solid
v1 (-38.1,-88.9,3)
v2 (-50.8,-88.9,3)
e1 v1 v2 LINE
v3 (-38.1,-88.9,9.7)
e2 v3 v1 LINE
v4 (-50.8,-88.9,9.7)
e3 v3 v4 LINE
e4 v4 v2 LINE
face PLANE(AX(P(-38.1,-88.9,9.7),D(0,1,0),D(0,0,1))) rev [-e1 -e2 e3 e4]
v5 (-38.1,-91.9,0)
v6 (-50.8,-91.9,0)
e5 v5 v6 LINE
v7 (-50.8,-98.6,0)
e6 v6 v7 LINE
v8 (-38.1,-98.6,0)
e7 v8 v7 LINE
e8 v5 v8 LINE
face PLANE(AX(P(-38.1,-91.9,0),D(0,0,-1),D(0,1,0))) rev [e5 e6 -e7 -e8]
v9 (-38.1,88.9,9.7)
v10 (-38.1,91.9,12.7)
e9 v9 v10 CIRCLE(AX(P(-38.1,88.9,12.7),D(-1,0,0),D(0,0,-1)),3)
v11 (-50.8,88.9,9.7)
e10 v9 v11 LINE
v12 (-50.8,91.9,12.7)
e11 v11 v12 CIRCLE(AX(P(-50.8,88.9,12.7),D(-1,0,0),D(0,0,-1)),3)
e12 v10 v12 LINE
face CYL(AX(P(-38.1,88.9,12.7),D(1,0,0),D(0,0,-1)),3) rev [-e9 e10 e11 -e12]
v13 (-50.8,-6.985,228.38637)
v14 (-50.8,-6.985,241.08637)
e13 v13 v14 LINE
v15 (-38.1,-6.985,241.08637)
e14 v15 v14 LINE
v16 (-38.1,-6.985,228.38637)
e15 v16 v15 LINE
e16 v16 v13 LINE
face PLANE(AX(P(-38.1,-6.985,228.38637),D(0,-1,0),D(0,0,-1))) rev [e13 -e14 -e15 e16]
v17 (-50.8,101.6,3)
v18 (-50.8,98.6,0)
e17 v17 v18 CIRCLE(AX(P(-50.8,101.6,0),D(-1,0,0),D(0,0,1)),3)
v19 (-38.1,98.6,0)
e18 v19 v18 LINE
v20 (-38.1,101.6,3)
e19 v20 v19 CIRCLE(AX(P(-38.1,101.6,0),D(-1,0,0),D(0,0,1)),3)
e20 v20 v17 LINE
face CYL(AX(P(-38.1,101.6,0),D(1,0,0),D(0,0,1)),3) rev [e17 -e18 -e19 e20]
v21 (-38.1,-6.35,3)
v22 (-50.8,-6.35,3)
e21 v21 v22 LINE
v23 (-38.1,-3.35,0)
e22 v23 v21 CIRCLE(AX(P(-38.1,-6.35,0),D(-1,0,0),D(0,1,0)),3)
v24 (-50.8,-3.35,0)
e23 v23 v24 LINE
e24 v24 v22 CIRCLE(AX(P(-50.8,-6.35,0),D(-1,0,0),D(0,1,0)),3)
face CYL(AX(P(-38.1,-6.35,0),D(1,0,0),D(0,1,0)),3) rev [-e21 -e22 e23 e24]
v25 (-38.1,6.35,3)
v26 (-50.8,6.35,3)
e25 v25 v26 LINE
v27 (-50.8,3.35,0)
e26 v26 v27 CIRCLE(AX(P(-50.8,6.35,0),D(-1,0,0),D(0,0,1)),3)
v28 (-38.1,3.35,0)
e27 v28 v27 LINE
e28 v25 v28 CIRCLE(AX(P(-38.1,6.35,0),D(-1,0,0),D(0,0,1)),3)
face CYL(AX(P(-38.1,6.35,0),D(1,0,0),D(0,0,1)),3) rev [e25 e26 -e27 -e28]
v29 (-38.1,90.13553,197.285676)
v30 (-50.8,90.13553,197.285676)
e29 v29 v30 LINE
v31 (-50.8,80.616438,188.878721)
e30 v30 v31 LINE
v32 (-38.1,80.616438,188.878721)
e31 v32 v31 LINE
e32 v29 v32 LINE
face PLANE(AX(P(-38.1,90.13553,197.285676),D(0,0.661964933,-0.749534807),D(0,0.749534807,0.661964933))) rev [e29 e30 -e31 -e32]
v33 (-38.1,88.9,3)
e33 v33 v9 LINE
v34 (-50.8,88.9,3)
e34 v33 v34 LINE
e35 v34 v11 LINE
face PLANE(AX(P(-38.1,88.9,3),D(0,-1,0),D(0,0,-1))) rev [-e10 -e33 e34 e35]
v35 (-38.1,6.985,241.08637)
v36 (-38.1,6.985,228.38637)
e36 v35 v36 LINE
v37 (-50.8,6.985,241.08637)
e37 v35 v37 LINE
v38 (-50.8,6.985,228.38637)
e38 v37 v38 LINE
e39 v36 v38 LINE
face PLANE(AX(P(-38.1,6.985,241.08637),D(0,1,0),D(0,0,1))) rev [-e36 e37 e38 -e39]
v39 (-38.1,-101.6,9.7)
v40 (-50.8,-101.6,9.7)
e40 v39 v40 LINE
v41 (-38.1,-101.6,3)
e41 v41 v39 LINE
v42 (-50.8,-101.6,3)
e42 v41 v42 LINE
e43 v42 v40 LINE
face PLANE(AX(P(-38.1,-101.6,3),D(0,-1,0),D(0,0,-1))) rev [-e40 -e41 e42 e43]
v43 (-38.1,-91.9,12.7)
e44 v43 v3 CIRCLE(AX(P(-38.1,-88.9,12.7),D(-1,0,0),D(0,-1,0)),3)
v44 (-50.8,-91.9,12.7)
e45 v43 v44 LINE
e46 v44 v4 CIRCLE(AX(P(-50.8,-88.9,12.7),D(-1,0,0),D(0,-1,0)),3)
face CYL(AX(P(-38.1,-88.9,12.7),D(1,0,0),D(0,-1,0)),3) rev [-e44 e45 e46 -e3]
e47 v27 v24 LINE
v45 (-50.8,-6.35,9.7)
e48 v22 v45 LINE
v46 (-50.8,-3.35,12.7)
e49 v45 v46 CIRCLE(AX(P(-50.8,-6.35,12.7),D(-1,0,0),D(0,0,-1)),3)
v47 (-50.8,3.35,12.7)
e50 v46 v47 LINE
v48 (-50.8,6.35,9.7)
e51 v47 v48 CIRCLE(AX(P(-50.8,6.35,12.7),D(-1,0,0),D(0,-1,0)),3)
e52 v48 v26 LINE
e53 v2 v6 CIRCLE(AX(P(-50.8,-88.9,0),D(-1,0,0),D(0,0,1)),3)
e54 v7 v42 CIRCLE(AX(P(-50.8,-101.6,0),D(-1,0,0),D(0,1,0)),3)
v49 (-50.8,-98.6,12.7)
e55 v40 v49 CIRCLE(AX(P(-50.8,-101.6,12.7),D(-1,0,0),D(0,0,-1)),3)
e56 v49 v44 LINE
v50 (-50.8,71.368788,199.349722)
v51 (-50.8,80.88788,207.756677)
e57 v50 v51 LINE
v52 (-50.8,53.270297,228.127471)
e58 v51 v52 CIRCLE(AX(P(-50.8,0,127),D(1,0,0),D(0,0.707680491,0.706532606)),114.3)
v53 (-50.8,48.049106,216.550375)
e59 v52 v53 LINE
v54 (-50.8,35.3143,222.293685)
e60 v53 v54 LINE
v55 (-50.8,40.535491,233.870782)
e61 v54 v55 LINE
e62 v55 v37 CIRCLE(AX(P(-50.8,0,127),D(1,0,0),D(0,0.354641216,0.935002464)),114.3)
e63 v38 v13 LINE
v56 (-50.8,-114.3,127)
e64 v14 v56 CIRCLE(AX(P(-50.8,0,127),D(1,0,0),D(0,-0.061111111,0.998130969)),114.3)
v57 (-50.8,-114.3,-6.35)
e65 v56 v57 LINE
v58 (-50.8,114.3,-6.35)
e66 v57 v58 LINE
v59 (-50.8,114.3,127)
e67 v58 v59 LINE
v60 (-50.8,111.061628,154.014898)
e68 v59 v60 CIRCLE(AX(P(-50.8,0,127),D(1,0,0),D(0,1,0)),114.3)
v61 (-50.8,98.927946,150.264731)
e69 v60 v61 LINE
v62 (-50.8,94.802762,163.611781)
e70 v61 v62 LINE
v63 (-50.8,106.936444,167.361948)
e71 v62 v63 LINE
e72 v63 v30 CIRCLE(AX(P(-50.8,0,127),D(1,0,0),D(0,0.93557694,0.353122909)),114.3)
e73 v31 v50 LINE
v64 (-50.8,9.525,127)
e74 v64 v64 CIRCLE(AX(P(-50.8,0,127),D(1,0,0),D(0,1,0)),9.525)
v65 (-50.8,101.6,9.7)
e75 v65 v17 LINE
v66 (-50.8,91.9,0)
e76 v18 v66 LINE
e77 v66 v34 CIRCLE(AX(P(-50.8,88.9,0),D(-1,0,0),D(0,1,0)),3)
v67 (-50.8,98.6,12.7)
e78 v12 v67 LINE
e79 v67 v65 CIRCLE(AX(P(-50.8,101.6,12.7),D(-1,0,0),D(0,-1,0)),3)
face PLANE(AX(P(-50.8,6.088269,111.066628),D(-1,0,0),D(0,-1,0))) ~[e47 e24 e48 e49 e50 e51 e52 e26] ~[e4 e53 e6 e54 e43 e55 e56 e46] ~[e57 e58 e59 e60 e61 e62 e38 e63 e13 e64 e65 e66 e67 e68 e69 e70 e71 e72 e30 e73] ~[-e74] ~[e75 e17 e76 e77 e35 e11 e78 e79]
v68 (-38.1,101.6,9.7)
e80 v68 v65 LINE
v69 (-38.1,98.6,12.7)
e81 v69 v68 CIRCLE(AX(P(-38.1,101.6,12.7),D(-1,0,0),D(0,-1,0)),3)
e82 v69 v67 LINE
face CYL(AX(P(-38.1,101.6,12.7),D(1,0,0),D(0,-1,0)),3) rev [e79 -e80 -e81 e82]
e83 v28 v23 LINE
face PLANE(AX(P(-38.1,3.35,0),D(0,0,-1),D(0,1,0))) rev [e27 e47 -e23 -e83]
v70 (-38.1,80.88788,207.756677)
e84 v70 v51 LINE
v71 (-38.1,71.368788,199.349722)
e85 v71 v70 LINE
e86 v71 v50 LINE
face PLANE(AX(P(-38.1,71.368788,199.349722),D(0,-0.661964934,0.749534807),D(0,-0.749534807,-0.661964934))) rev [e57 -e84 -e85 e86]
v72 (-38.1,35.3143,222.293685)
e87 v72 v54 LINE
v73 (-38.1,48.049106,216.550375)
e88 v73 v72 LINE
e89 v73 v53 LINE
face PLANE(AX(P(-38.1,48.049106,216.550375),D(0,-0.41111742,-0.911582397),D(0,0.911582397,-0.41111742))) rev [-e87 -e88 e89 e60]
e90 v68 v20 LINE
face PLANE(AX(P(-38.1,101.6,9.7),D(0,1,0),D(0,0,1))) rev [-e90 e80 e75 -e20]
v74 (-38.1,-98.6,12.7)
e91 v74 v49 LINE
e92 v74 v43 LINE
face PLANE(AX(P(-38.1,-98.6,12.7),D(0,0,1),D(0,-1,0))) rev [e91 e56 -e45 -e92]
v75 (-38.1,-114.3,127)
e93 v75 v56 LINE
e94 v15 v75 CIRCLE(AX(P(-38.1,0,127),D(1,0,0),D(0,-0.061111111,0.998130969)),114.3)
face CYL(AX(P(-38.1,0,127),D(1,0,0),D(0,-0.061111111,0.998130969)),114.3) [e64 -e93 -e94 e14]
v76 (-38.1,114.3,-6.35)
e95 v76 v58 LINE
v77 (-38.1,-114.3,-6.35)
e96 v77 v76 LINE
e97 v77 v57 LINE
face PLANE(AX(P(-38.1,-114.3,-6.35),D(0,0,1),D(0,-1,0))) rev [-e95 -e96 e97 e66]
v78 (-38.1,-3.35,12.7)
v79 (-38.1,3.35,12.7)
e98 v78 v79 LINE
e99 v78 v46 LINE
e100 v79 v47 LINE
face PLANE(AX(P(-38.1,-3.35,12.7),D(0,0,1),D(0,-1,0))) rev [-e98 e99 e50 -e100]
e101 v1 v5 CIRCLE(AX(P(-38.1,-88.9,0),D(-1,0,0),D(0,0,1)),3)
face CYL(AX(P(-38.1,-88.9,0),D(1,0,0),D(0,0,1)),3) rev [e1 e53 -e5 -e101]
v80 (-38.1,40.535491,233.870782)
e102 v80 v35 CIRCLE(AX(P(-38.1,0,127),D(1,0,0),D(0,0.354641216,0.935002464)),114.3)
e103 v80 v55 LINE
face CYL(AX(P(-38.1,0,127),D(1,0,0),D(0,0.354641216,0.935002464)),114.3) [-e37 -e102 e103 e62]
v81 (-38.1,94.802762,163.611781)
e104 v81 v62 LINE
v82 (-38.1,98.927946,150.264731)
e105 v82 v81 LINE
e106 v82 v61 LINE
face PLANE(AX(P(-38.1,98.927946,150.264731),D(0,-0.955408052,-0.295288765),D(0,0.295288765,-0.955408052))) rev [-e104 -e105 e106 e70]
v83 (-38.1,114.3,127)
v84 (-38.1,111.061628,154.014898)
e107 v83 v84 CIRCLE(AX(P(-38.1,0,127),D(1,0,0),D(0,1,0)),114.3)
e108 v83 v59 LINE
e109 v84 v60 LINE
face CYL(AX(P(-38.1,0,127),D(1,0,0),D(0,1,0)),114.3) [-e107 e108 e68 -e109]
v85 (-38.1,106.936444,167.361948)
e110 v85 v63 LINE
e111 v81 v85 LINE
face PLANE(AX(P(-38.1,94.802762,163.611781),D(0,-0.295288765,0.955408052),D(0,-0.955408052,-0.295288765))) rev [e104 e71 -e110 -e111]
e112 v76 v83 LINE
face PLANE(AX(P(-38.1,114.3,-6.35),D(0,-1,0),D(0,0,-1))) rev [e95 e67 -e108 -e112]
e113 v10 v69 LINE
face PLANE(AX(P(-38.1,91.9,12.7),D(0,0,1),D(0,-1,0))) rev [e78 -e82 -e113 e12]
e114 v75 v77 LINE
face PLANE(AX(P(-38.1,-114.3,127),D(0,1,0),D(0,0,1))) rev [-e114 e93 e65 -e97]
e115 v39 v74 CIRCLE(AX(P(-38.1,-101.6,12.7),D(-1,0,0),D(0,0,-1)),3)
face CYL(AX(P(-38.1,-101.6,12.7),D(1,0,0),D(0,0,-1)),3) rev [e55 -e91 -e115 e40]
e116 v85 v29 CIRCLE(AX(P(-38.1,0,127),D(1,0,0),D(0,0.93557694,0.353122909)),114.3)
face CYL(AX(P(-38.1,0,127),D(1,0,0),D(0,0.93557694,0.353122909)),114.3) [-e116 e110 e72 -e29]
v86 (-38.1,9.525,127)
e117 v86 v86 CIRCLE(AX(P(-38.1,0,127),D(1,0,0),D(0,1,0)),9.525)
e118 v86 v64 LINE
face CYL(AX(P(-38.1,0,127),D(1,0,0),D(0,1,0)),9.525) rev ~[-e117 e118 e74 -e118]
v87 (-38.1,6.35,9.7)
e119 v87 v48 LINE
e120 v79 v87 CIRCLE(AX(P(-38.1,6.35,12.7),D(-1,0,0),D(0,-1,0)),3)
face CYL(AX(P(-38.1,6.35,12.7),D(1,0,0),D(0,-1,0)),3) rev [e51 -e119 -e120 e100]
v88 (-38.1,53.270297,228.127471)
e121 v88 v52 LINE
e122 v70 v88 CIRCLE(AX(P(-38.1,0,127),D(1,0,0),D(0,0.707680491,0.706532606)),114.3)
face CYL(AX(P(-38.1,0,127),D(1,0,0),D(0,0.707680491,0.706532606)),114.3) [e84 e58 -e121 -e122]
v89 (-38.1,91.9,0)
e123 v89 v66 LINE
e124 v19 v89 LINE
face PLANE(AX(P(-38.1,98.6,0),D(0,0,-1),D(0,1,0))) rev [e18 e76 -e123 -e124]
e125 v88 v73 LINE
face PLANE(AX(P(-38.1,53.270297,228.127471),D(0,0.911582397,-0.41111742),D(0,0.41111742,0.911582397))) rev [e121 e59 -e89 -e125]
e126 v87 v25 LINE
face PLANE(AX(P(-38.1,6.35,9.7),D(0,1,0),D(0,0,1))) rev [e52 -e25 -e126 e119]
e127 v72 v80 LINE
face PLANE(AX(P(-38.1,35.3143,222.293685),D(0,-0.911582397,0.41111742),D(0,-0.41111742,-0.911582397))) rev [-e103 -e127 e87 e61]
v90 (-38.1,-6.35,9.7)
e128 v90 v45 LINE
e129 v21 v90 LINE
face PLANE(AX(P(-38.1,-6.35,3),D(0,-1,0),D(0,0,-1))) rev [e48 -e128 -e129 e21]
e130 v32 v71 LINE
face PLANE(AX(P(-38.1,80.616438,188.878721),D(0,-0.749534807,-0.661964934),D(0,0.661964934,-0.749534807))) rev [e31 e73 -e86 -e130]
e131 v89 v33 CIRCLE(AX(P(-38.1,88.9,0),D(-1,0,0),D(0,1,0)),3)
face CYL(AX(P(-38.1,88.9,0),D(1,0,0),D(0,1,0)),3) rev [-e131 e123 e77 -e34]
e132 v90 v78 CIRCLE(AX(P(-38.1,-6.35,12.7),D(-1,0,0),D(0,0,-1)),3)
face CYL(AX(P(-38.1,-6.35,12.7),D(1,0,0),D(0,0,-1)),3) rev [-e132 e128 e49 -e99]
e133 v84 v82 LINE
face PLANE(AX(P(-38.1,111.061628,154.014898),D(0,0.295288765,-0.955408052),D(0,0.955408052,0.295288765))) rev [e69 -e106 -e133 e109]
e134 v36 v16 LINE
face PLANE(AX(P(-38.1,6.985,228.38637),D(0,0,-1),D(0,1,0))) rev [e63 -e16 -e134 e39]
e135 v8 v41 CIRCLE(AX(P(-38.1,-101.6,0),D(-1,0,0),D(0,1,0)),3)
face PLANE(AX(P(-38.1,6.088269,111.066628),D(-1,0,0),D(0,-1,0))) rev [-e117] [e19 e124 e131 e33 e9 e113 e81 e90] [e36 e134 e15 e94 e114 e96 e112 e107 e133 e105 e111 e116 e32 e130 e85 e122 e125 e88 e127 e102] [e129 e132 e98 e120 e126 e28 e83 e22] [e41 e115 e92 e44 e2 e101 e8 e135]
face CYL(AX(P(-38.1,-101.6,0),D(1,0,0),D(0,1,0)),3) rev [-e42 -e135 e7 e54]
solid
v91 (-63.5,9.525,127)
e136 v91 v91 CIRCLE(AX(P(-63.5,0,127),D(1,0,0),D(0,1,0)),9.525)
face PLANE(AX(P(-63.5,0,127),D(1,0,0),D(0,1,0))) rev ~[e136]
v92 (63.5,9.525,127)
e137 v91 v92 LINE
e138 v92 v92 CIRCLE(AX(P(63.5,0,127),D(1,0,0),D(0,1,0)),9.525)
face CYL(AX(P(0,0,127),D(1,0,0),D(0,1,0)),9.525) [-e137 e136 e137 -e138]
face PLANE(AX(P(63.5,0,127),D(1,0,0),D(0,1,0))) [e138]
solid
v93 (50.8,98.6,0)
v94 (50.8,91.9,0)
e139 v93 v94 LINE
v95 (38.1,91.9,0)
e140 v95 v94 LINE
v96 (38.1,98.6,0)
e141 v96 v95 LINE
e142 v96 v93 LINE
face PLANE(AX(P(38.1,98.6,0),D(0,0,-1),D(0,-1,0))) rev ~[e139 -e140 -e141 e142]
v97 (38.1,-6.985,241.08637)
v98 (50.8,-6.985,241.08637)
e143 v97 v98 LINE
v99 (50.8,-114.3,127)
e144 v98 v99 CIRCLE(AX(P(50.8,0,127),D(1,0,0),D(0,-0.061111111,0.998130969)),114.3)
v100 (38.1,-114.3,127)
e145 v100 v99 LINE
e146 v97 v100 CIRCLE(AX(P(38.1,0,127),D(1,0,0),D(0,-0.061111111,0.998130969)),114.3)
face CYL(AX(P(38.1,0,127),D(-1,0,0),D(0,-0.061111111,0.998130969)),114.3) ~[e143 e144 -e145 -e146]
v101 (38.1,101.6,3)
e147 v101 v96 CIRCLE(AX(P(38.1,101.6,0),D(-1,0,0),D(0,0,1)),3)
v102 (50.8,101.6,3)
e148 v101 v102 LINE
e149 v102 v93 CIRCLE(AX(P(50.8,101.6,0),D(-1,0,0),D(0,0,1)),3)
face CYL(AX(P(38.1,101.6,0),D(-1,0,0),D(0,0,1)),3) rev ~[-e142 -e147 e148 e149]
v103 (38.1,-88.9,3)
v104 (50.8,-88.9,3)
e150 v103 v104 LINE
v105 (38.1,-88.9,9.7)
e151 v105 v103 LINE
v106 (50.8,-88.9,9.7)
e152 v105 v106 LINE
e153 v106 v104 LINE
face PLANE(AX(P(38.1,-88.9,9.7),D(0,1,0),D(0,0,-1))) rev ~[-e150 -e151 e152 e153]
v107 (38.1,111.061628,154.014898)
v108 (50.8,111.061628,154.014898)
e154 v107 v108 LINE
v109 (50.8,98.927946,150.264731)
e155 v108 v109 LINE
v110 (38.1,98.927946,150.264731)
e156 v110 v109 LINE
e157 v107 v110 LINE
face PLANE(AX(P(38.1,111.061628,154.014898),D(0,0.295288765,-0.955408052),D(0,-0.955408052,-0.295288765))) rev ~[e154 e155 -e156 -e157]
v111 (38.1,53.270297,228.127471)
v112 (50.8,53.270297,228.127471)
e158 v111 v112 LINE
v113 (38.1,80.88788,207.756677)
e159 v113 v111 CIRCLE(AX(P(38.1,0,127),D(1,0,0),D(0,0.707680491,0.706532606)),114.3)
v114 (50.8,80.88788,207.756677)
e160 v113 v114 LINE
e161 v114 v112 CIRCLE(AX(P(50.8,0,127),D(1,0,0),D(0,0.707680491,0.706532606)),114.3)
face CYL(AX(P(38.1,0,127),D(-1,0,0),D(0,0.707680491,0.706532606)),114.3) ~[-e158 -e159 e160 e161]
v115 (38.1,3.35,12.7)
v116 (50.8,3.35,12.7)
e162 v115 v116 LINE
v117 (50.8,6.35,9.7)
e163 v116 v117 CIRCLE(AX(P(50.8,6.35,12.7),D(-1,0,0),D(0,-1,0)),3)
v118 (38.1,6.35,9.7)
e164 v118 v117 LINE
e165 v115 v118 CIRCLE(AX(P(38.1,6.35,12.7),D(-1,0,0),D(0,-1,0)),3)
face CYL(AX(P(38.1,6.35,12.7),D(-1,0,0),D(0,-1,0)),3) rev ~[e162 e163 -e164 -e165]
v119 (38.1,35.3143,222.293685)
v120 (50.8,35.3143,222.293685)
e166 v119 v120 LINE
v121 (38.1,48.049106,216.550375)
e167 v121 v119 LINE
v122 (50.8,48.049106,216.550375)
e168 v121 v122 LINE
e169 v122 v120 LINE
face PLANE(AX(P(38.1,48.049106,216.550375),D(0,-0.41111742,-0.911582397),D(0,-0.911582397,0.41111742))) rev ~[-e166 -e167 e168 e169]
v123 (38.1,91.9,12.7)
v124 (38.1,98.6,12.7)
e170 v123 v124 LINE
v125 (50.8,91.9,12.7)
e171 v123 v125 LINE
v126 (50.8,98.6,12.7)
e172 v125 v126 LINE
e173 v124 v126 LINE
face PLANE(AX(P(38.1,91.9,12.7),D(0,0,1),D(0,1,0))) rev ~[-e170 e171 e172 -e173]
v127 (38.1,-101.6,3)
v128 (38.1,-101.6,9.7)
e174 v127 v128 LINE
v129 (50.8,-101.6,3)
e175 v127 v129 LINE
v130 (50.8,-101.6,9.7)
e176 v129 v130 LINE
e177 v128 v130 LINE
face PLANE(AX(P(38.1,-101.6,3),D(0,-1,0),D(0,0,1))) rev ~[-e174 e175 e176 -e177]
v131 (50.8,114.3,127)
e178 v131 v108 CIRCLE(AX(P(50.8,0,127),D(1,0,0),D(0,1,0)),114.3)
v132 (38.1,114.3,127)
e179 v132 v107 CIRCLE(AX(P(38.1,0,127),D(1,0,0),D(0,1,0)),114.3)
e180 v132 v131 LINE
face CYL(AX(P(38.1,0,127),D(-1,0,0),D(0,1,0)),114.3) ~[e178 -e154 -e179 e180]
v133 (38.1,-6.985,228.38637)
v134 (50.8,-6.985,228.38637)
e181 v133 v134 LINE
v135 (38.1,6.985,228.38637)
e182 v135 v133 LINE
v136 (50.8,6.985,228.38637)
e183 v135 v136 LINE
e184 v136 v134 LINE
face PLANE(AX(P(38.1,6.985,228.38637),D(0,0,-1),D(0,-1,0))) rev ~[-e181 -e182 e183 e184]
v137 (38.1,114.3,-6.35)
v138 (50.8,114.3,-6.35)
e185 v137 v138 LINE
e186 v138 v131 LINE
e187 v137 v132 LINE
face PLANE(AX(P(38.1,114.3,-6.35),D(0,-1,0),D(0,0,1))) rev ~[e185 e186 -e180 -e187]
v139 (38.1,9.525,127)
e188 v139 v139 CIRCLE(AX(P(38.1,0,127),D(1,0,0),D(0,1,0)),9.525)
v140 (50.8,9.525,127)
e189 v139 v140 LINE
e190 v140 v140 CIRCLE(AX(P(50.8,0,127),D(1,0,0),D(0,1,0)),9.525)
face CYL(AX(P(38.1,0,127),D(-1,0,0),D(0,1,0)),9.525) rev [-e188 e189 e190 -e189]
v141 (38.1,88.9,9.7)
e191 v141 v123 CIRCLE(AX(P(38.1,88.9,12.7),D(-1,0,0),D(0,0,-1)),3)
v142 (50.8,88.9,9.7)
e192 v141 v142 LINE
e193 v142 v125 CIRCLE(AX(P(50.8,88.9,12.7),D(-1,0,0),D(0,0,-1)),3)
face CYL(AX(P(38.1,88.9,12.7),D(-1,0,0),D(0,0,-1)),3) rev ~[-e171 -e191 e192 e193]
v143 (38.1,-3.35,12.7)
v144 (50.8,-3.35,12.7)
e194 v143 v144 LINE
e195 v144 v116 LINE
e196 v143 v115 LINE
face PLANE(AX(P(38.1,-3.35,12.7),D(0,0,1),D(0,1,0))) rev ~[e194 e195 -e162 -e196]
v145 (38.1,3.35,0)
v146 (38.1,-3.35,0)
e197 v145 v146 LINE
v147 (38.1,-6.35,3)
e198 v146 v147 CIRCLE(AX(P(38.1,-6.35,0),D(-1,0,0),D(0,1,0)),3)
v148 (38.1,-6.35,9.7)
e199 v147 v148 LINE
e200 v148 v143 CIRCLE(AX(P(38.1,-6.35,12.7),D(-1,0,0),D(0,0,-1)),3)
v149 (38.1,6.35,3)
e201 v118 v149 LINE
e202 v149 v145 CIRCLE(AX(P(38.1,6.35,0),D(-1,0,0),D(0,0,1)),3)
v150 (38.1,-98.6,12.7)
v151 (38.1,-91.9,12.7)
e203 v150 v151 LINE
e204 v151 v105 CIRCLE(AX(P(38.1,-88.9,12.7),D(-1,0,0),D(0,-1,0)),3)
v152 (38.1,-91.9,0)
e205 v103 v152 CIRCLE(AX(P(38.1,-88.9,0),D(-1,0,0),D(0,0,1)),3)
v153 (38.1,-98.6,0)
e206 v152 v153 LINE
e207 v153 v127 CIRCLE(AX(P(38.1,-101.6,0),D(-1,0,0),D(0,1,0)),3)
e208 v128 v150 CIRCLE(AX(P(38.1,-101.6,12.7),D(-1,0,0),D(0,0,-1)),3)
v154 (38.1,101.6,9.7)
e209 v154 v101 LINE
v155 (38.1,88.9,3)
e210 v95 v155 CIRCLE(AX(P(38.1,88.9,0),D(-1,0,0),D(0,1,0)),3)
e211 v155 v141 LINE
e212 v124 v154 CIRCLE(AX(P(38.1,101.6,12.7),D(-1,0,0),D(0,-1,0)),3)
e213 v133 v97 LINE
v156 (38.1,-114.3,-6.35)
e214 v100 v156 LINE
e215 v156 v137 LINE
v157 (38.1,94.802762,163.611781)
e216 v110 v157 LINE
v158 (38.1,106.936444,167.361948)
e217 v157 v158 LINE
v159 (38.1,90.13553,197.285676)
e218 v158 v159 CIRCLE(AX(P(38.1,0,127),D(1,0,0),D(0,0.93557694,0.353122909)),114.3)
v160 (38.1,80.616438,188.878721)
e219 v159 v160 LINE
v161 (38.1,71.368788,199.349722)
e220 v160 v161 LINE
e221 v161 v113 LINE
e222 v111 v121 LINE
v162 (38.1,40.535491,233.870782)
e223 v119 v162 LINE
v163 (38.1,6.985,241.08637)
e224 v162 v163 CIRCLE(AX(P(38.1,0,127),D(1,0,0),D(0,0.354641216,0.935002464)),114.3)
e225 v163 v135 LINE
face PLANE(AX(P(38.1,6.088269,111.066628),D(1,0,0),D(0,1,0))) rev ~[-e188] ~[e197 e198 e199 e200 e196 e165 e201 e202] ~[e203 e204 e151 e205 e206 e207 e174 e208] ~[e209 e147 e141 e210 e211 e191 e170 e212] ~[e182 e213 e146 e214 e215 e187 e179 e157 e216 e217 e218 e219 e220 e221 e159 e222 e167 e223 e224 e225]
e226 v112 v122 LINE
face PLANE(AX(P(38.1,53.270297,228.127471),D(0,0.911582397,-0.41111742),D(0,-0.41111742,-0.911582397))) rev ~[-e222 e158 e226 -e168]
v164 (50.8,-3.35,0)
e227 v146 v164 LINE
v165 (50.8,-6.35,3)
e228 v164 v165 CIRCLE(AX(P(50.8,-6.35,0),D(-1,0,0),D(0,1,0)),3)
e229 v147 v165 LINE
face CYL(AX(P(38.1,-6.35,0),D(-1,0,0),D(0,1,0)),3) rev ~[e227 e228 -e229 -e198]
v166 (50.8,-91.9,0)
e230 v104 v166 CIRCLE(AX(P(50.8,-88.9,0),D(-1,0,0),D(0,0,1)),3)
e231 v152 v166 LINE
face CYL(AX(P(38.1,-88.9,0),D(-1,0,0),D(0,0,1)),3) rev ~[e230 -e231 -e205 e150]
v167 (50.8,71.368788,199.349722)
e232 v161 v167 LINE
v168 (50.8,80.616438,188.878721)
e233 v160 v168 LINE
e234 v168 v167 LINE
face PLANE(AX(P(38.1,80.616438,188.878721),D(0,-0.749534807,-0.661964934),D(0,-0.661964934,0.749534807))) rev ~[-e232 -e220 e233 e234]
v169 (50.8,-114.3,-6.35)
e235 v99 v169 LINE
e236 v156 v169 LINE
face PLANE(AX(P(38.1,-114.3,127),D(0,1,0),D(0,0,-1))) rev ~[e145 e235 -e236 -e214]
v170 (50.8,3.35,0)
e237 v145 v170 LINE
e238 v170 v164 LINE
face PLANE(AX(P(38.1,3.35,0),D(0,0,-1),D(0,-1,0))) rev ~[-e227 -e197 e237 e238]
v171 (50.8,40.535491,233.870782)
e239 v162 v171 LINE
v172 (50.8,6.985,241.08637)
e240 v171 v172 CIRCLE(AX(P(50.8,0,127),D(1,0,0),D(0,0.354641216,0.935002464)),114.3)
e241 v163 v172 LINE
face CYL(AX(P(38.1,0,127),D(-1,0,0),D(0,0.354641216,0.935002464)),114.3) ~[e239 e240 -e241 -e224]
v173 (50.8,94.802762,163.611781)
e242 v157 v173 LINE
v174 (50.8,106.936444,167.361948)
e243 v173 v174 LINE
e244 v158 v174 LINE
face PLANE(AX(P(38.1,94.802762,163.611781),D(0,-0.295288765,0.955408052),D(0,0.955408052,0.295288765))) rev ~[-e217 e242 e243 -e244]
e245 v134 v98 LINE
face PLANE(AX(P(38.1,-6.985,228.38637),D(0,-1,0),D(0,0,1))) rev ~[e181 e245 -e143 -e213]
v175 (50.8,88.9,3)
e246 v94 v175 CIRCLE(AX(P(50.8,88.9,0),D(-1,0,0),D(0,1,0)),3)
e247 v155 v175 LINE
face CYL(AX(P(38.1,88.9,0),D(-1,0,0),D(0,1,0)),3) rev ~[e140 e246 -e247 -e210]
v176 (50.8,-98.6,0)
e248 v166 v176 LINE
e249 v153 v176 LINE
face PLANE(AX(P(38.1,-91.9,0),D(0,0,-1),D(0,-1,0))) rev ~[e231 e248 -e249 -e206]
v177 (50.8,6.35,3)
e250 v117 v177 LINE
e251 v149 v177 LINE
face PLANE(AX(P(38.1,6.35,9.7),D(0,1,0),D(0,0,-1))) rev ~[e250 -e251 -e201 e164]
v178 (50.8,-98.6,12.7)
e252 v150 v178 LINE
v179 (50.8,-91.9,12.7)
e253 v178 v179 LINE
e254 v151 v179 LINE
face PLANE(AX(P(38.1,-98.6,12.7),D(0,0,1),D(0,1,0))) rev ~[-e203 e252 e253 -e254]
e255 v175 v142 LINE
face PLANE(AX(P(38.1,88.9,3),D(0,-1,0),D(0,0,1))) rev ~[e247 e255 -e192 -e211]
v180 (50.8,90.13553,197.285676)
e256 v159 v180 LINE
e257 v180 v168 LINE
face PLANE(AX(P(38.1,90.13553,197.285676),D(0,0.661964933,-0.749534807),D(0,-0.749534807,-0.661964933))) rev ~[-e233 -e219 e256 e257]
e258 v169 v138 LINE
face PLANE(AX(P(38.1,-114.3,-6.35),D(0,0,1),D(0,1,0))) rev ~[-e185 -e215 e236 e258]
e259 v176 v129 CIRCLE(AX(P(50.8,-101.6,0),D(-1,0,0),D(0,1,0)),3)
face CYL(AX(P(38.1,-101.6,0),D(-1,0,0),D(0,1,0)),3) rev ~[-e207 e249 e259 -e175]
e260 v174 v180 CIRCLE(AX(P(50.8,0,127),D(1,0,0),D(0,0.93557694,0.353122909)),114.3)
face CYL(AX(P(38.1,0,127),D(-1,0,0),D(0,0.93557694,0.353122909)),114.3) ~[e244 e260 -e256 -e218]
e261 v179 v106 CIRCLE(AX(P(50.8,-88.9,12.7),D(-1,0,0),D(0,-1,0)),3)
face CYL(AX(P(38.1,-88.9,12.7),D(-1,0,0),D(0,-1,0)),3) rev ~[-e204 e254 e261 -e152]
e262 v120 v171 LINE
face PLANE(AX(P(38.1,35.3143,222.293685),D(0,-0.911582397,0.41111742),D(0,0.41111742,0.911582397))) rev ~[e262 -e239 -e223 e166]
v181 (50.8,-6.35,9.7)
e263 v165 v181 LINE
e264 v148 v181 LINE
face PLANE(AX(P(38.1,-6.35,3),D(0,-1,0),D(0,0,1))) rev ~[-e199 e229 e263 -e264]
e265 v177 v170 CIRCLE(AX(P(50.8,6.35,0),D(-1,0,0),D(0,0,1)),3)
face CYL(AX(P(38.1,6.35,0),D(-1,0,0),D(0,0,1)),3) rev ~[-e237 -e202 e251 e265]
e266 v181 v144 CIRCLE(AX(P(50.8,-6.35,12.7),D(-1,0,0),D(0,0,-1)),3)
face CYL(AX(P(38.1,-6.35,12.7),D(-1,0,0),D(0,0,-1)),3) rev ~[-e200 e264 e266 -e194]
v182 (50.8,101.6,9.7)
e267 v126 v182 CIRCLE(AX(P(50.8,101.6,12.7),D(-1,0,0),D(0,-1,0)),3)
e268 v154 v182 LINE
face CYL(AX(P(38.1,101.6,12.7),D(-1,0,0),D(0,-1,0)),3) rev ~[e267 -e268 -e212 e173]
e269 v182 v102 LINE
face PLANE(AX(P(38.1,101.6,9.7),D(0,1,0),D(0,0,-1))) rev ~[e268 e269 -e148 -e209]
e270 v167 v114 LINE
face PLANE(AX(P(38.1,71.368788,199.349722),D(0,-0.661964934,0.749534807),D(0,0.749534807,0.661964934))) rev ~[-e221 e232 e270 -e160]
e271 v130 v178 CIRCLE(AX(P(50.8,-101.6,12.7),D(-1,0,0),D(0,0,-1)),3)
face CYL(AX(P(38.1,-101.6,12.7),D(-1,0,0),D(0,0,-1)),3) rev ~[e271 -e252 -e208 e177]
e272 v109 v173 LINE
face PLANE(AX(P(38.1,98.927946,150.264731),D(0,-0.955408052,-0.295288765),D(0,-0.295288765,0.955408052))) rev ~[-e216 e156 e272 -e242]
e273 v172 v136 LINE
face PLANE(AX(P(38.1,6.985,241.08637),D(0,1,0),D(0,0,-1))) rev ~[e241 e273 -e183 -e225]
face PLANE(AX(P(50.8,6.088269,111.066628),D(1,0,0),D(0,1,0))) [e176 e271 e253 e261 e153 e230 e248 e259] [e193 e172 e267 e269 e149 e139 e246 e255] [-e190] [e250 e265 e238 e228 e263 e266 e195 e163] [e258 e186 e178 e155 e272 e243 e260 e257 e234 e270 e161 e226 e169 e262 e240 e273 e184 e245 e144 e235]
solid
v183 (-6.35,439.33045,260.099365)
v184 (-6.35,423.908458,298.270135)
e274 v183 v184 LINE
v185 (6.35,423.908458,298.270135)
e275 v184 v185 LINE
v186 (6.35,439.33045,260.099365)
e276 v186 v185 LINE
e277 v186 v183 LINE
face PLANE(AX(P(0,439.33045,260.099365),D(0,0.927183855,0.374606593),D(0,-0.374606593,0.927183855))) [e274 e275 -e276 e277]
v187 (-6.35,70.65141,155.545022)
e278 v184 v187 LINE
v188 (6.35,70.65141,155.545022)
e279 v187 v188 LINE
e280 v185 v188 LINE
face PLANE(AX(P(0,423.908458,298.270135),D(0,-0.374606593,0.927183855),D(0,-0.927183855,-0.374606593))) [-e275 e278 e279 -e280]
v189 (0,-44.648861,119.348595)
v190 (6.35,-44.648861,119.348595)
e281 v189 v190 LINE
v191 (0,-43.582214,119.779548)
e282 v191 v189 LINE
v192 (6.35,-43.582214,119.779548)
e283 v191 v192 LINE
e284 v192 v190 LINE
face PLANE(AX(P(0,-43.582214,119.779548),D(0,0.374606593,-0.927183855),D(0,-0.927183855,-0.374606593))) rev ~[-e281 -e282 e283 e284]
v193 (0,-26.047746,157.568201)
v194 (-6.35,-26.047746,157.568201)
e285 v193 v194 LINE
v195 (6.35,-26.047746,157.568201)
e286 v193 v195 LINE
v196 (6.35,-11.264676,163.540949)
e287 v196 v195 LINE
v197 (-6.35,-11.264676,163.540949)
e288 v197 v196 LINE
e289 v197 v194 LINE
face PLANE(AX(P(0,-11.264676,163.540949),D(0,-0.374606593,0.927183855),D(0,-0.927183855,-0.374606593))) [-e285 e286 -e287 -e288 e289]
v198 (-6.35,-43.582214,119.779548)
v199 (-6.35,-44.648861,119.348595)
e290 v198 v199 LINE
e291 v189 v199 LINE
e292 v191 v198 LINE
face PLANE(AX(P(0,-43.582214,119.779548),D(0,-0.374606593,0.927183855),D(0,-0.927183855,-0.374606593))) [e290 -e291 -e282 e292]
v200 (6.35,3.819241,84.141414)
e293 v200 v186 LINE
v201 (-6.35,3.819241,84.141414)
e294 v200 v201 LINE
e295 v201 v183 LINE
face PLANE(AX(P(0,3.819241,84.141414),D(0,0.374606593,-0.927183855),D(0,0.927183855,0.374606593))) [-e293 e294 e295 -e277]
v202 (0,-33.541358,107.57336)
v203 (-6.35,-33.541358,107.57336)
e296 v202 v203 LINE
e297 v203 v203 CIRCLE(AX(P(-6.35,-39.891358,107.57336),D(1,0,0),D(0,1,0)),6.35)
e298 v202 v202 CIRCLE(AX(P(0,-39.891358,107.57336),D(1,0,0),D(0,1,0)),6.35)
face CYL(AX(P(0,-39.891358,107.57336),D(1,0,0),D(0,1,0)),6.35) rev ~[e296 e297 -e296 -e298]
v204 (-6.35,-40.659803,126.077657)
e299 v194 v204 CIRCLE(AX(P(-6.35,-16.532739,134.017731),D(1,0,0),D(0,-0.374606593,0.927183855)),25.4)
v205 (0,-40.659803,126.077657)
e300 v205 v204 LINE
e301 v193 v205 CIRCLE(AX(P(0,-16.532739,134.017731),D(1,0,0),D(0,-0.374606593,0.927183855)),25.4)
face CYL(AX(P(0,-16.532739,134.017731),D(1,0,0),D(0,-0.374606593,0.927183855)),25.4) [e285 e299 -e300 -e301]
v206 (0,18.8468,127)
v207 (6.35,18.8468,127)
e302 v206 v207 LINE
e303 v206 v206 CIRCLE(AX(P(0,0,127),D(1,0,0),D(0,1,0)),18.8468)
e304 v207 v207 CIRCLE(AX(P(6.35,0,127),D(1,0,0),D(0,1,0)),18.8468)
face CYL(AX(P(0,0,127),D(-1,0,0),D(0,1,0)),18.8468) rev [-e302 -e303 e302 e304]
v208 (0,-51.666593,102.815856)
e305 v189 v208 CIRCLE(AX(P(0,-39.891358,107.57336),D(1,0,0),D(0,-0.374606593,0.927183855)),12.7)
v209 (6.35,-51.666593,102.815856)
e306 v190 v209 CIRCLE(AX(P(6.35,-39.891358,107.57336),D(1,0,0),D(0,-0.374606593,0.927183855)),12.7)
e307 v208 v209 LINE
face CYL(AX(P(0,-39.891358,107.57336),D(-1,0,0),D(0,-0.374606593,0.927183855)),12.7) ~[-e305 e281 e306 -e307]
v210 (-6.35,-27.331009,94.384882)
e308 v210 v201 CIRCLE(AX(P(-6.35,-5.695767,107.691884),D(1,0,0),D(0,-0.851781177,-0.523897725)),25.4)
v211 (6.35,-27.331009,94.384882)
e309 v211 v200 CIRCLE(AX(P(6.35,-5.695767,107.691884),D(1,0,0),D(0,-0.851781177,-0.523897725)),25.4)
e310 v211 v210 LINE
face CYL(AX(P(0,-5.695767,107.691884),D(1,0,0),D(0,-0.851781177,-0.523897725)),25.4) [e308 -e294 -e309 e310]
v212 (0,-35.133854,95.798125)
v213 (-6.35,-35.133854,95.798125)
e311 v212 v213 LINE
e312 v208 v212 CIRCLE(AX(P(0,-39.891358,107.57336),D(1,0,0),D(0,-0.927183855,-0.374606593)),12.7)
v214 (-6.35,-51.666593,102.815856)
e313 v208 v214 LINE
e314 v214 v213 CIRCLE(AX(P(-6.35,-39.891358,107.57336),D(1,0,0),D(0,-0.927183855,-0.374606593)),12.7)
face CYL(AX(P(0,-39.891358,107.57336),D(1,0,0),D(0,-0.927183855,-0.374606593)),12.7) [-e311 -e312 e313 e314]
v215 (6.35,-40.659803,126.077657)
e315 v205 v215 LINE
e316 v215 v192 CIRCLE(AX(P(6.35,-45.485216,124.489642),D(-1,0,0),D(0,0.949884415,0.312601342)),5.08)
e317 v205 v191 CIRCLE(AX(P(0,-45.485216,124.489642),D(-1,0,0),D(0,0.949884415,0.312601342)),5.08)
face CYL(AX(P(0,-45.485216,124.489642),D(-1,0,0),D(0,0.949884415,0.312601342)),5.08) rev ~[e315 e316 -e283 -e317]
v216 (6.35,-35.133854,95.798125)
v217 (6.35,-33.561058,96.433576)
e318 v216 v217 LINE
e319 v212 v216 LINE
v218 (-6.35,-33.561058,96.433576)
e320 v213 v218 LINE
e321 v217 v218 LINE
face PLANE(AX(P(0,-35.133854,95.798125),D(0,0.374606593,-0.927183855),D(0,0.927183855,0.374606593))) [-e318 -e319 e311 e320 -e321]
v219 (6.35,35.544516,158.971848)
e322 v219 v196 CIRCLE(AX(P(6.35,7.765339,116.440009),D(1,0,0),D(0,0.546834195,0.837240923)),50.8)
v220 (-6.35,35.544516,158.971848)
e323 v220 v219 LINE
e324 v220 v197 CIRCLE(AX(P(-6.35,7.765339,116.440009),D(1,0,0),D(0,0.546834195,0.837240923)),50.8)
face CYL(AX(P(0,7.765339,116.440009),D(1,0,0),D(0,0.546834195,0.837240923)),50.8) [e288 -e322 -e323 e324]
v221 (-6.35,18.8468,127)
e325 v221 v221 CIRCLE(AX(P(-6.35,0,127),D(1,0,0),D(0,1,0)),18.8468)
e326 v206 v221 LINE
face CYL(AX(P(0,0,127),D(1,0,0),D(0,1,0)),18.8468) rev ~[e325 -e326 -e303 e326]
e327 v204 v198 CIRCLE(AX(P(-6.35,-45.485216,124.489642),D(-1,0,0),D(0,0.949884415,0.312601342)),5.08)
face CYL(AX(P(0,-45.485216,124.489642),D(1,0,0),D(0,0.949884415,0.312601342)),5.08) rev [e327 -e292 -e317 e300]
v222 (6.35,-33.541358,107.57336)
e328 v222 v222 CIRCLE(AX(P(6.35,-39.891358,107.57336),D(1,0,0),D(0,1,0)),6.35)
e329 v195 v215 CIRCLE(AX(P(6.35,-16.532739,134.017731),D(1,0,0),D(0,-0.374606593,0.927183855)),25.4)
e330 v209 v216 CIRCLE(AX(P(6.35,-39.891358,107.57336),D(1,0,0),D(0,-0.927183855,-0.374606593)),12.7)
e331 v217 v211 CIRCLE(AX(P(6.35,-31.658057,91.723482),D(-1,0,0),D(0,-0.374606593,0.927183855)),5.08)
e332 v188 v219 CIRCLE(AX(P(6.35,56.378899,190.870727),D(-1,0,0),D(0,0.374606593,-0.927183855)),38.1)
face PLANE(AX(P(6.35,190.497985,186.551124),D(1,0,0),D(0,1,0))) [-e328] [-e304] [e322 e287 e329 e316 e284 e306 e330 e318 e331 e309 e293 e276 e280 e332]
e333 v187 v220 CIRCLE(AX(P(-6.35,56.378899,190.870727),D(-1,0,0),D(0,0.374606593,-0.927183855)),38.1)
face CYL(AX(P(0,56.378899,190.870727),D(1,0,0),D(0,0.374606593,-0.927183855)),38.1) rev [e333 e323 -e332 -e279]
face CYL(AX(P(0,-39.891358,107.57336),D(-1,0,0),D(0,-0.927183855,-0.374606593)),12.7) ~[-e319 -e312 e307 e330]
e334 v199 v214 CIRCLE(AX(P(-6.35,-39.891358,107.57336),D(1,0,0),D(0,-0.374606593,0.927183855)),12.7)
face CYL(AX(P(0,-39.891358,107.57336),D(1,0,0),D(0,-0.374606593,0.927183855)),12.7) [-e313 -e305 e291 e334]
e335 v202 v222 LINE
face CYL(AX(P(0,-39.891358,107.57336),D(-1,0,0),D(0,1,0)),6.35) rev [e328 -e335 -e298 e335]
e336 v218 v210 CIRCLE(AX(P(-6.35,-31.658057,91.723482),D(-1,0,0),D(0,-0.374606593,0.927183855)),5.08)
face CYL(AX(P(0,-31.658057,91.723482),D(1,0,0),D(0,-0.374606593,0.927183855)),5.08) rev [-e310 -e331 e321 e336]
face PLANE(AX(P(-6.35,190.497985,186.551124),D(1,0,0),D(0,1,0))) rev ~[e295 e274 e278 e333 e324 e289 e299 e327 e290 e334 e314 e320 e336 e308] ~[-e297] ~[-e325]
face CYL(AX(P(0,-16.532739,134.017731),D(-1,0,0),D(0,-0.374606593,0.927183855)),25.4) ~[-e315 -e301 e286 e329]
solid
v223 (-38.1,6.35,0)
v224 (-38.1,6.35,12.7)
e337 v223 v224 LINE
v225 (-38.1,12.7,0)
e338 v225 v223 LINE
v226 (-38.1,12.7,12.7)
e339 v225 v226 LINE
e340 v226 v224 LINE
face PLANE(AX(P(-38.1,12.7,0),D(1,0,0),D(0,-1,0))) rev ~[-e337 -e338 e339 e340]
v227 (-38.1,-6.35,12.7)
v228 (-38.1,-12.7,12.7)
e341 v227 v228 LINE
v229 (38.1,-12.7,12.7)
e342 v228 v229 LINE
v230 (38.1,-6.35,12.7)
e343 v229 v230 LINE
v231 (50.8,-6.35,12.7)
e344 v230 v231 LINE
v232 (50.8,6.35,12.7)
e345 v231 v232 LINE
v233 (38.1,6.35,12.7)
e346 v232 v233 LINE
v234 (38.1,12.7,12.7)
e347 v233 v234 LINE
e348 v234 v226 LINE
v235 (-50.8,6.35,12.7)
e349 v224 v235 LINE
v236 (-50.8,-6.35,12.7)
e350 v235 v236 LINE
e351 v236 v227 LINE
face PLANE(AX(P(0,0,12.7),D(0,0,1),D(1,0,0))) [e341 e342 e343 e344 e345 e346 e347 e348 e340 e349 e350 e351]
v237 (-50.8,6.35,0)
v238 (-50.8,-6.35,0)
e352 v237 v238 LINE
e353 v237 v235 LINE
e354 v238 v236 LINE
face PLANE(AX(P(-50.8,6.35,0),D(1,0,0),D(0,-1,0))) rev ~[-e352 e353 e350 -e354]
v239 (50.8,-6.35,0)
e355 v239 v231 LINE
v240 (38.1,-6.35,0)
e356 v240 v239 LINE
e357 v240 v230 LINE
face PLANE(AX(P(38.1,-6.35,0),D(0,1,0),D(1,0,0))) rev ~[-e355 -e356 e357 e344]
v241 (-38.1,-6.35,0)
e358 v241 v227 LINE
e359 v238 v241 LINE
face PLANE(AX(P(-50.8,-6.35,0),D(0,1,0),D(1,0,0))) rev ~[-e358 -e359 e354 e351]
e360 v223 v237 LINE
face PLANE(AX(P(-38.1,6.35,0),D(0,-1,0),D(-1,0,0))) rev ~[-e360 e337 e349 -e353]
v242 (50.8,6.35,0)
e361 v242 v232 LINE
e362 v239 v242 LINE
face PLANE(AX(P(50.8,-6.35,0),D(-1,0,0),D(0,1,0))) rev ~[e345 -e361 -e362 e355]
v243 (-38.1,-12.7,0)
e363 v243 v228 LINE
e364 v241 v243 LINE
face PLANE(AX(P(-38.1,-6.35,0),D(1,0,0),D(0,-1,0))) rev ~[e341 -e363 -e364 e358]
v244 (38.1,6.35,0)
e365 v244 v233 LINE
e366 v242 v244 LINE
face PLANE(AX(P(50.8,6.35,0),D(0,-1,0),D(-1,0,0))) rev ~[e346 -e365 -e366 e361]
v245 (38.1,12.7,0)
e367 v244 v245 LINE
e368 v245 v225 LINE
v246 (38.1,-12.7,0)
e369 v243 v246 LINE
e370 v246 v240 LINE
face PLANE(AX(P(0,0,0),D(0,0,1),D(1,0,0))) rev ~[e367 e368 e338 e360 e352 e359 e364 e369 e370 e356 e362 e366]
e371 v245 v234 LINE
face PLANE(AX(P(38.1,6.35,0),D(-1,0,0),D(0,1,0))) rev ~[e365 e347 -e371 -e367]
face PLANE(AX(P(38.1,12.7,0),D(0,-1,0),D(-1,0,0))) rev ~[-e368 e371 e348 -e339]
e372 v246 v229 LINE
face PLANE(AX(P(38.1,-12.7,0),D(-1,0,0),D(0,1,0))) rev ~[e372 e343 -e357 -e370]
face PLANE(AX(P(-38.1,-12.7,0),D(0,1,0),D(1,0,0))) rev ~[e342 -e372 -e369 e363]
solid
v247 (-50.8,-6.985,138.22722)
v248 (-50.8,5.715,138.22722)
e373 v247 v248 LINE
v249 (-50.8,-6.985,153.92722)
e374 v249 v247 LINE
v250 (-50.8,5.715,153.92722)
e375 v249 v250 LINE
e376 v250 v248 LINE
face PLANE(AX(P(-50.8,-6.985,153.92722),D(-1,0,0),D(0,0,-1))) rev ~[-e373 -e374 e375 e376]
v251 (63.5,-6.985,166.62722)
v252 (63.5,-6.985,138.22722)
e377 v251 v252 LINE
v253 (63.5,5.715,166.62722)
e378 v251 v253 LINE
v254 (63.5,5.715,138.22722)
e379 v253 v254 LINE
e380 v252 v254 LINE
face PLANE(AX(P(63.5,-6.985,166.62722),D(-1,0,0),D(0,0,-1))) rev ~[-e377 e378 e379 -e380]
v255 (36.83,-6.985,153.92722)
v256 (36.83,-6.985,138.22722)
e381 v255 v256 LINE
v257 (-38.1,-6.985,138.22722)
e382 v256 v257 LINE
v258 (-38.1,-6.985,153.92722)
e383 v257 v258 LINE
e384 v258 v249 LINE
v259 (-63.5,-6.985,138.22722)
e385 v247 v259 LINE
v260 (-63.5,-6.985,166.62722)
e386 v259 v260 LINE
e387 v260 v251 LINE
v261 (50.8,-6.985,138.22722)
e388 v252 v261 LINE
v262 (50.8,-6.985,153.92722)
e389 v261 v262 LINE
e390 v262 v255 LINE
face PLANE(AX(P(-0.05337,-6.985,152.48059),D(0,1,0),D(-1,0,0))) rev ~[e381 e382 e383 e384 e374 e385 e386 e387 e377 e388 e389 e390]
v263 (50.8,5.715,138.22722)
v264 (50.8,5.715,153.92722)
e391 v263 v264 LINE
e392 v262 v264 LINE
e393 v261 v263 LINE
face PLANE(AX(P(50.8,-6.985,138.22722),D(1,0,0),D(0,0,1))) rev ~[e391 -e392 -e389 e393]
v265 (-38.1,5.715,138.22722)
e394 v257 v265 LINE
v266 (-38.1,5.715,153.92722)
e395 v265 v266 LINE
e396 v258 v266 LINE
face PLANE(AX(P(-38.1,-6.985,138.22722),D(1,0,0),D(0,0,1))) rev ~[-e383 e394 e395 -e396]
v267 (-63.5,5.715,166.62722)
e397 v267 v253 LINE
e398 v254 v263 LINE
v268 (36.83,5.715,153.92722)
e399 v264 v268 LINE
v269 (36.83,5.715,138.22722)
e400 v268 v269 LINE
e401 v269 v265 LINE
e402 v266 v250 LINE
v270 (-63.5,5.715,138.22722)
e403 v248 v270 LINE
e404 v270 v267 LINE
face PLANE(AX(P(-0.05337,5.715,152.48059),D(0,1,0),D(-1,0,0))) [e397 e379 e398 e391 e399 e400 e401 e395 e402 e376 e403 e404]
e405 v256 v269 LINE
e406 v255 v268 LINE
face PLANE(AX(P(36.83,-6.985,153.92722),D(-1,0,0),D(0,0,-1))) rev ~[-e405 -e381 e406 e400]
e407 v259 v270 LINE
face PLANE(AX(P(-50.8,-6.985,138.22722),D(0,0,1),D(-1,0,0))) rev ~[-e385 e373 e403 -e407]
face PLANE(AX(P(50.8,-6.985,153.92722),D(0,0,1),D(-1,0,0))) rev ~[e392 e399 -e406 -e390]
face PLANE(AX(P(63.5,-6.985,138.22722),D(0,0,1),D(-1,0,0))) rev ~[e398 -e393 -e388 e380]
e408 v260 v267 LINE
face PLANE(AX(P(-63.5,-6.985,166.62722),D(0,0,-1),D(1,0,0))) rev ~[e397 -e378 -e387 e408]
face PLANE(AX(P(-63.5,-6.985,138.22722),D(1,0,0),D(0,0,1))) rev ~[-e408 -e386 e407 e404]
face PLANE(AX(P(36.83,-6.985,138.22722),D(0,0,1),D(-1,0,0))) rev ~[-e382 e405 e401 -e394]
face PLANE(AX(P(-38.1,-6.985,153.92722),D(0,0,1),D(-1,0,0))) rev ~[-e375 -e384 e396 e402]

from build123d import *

# Parameters (mm, degrees)
F3_R           = 9.525
F4_DEPTH       = 12.7
F6_R           = 9.525
F7_DEPTH       = 63.5
F7_DEPTH_BACK  = 63.5
F9_DEPTH       = 12.7
F11_DEPTH      = 12.7
F12_R          = 6.35
F12_R_2        = 18.8468
F13_DEPTH      = 6.35
F13_DEPTH_BACK = 6.35


# Not quite as in the source:
# - a feature names something its author has since deleted; it is built from what else it names


with BuildPart() as f4:
    # F3 (on offset) → F4 (new body)
    with BuildSketch(Plane.YZ.offset(38.1)):
        with BuildLine():
            Line((-114.3, 127), (-114.3, -6.35))
            Line((-114.3, -6.35), (114.3, -6.35))
            Line((114.3, -6.35), (114.3, 127))
            ThreePointArc((114.3, 127), (113.4875193986, 140.6041515996), (111.0616283334, 154.0148979626))
            Line((111.0616283334, 154.0148979626), (98.9279460754, 150.2647306514))
            Line((98.9279460754, 150.2647306514), (94.802762033, 163.6117811352))
            Line((94.802762033, 163.6117811352), (106.936444291, 167.3619484464))
            ThreePointArc((106.936444291, 167.3619484464), (99.6654310495, 182.9579471899), (90.1355302257, 197.2856755742))
            Line((90.1355302257, 197.2856755742), (80.6164381776, 188.8787209188))
            Line((80.6164381776, 188.8787209188), (71.3687880566, 199.3497221717))
            Line((71.3687880566, 199.3497221717), (80.8878801047, 207.7566768272))
            ThreePointArc((80.8878801047, 207.7566768272), (67.8479656545, 218.9844745408), (53.2702970855, 228.1274712846))
            Line((53.2702970855, 228.1274712846), (48.0491058481, 216.5503748411))
            Line((48.0491058481, 216.5503748411), (35.3142997602, 222.2936852023))
            Line((35.3142997602, 222.2936852023), (40.5354909977, 233.8707816458))
            ThreePointArc((40.5354909977, 233.8707816458), (24.0325912935, 238.7449084107), (6.985, 241.0863698038))
            Line((6.985, 241.0863698038), (6.985, 228.3863698038))
            Line((6.985, 228.3863698038), (-6.985, 228.3863698038))
            Line((-6.985, 228.3863698038), (-6.985, 241.0863698038))
            ThreePointArc((-6.985, 241.0863698038), (-83.2552565908, 205.3138062541), (-114.3, 127))
        make_face()
        with BuildLine():
            ThreePointArc((-98.6, 0), (-103.7213203436, -2.1213203436), (-101.6, 3))
            Line((-101.6, 3), (-101.6, 9.7))
            ThreePointArc((-101.6, 9.7), (-103.7213203436, 14.8213203436), (-98.6, 12.7))
            Line((-98.6, 12.7), (-91.9, 12.7))
            ThreePointArc((-91.9, 12.7), (-86.7786796564, 14.8213203436), (-88.9, 9.7))
            Line((-88.9, 9.7), (-88.9, 3))
            ThreePointArc((-88.9, 3), (-86.7786796564, -2.1213203436), (-91.9, 0))
            Line((-91.9, 0), (-98.6, 0))
        make_face(mode=Mode.SUBTRACT)
        with BuildLine():
            ThreePointArc((-3.35, 0), (-8.4713203436, -2.1213203436), (-6.35, 3))
            Line((-6.35, 3), (-6.35, 9.7))
            ThreePointArc((-6.35, 9.7), (-8.4713203436, 14.8213203436), (-3.35, 12.7))
            Line((-3.35, 12.7), (3.35, 12.7))
            ThreePointArc((3.35, 12.7), (8.4713203436, 14.8213203436), (6.35, 9.7))
            Line((6.35, 9.7), (6.35, 3))
            ThreePointArc((6.35, 3), (8.4713203436, -2.1213203436), (3.35, 0))
            Line((3.35, 0), (-3.35, 0))
        make_face(mode=Mode.SUBTRACT)
        with BuildLine():
            Line((101.6, 9.7), (101.6, 3))
            ThreePointArc((101.6, 3), (103.7213203436, -2.1213203436), (98.6, 0))
            Line((98.6, 0), (91.9, 0))
            ThreePointArc((91.9, 0), (86.7786796564, -2.1213203436), (88.9, 3))
            Line((88.9, 3), (88.9, 9.7))
            ThreePointArc((88.9, 9.7), (86.7786796564, 14.8213203436), (91.9, 12.7))
            Line((91.9, 12.7), (98.6, 12.7))
            ThreePointArc((98.6, 12.7), (103.7213203436, 14.8213203436), (101.6, 9.7))
        make_face(mode=Mode.SUBTRACT)
        with Locations((0, 127)):
            Circle(F3_R, mode=Mode.SUBTRACT)
    extrude(amount=F4_DEPTH)


with BuildPart() as f5_1:
    # F5: instance of F4
    add(f4.part.mirror(Plane.YZ))


with BuildPart() as f7:
    # F6 (on Right) → F7 (new body, two sides)
    with BuildSketch(Plane.YZ) as f7_sk:
        with Locations((0, 127)):
            Circle(F6_R)
    extrude(amount=F7_DEPTH)
    extrude(f7_sk.sketch, amount=-F7_DEPTH_BACK)


with BuildPart() as f9:
    # F8 (on Top) → F9 (new body)
    with BuildSketch(Plane.XY):
        Polygon((-38.1, -6.35), (-38.1, -12.7), (38.1, -12.7), (38.1, -6.35), (50.8, -6.35), (50.8, 6.35), (38.1, 6.35), (38.1, 12.7), (-38.1, 12.7), (-38.1, 6.35), (-50.8, 6.35), (-50.8, -6.35), align=None)
    extrude(amount=F9_DEPTH)


with BuildPart() as f11:
    # F10 (on face) → F11 (new body)
    with BuildSketch(Plane(origin=(0, -6.985, 0), x_dir=(-1, 0, 0), z_dir=(0, 1, 0))):
        Polygon((38.1, 138.2272196057), (38.1, 153.9272196057), (50.8, 153.9272196057), (50.8, 138.2272196057), (63.5, 138.2272196057), (63.5, 166.6272196057), (-63.5, 166.6272196057), (-63.5, 138.2272196057), (-50.8, 138.2272196057), (-50.8, 153.9272196057), (-36.83, 153.9272196057), (-36.83, 138.2272196057), align=None)
    extrude(amount=F11_DEPTH)


with BuildPart() as f13:
    # F12 (on Right) → F13 (new body, two sides)
    with BuildSketch(Plane.YZ) as f13_sk:
        with BuildLine():
            Line((439.3304503869, 260.0993646615), (423.9084583079, 298.2701345098))
            Line((423.9084583079, 298.2701345098), (70.651409718, 155.5450224183))
            ThreePointArc((70.651409718, 155.5450224183), (52.6775037256, 152.9509477861), (35.5445156861, 158.9718481058))
            ThreePointArc((35.5445156861, 158.9718481058), (12.7005316335, 166.9997151987), (-11.2646763564, 163.5409490225))
            Line((-11.2646763564, 163.5409490225), (-26.0477461621, 157.5682011226))
            ThreePointArc((-26.0477461621, 157.5682011226), (-39.5731561265, 144.7088099424), (-40.659802818, 126.0776571279))
            ThreePointArc((-40.659802818, 126.0776571279), (-40.8771321563, 122.351426565), (-43.5822141492, 119.779548329))
            Line((-43.5822141492, 119.779548329), (-44.6488614796, 119.3485948338))
            ThreePointArc((-44.6488614796, 119.3485948338), (-51.5817693821, 112.5356452126), (-51.6665926962, 102.8158561444))
            ThreePointArc((-51.6665926962, 102.8158561444), (-44.853643075, 95.8829482419), (-35.1338540068, 95.7981249278))
            Line((-35.1338540068, 95.7981249278), (-33.561058403, 96.4335755996))
            ThreePointArc((-33.561058403, 96.4335755996), (-30.0711457165, 96.549257501), (-27.3310085278, 94.3848820601))
            ThreePointArc((-27.3310085278, 94.3848820601), (-13.6303225842, 83.5630048559), (3.8192408484, 84.1414143627))
            Line((3.8192408484, 84.1414143627), (439.3304503869, 260.0993646615))
        make_face()
        with Locations((-39.8913577432, 107.5733598808)):
            Circle(F12_R, mode=Mode.SUBTRACT)
        with Locations((0, 127)):
            Circle(F12_R_2, mode=Mode.SUBTRACT)
    extrude(amount=F13_DEPTH)
    extrude(f13_sk.sketch, amount=-F13_DEPTH_BACK)


solid = Compound([f4.part, f5_1.part, f7.part, f9.part, f11.part, f13.part])
